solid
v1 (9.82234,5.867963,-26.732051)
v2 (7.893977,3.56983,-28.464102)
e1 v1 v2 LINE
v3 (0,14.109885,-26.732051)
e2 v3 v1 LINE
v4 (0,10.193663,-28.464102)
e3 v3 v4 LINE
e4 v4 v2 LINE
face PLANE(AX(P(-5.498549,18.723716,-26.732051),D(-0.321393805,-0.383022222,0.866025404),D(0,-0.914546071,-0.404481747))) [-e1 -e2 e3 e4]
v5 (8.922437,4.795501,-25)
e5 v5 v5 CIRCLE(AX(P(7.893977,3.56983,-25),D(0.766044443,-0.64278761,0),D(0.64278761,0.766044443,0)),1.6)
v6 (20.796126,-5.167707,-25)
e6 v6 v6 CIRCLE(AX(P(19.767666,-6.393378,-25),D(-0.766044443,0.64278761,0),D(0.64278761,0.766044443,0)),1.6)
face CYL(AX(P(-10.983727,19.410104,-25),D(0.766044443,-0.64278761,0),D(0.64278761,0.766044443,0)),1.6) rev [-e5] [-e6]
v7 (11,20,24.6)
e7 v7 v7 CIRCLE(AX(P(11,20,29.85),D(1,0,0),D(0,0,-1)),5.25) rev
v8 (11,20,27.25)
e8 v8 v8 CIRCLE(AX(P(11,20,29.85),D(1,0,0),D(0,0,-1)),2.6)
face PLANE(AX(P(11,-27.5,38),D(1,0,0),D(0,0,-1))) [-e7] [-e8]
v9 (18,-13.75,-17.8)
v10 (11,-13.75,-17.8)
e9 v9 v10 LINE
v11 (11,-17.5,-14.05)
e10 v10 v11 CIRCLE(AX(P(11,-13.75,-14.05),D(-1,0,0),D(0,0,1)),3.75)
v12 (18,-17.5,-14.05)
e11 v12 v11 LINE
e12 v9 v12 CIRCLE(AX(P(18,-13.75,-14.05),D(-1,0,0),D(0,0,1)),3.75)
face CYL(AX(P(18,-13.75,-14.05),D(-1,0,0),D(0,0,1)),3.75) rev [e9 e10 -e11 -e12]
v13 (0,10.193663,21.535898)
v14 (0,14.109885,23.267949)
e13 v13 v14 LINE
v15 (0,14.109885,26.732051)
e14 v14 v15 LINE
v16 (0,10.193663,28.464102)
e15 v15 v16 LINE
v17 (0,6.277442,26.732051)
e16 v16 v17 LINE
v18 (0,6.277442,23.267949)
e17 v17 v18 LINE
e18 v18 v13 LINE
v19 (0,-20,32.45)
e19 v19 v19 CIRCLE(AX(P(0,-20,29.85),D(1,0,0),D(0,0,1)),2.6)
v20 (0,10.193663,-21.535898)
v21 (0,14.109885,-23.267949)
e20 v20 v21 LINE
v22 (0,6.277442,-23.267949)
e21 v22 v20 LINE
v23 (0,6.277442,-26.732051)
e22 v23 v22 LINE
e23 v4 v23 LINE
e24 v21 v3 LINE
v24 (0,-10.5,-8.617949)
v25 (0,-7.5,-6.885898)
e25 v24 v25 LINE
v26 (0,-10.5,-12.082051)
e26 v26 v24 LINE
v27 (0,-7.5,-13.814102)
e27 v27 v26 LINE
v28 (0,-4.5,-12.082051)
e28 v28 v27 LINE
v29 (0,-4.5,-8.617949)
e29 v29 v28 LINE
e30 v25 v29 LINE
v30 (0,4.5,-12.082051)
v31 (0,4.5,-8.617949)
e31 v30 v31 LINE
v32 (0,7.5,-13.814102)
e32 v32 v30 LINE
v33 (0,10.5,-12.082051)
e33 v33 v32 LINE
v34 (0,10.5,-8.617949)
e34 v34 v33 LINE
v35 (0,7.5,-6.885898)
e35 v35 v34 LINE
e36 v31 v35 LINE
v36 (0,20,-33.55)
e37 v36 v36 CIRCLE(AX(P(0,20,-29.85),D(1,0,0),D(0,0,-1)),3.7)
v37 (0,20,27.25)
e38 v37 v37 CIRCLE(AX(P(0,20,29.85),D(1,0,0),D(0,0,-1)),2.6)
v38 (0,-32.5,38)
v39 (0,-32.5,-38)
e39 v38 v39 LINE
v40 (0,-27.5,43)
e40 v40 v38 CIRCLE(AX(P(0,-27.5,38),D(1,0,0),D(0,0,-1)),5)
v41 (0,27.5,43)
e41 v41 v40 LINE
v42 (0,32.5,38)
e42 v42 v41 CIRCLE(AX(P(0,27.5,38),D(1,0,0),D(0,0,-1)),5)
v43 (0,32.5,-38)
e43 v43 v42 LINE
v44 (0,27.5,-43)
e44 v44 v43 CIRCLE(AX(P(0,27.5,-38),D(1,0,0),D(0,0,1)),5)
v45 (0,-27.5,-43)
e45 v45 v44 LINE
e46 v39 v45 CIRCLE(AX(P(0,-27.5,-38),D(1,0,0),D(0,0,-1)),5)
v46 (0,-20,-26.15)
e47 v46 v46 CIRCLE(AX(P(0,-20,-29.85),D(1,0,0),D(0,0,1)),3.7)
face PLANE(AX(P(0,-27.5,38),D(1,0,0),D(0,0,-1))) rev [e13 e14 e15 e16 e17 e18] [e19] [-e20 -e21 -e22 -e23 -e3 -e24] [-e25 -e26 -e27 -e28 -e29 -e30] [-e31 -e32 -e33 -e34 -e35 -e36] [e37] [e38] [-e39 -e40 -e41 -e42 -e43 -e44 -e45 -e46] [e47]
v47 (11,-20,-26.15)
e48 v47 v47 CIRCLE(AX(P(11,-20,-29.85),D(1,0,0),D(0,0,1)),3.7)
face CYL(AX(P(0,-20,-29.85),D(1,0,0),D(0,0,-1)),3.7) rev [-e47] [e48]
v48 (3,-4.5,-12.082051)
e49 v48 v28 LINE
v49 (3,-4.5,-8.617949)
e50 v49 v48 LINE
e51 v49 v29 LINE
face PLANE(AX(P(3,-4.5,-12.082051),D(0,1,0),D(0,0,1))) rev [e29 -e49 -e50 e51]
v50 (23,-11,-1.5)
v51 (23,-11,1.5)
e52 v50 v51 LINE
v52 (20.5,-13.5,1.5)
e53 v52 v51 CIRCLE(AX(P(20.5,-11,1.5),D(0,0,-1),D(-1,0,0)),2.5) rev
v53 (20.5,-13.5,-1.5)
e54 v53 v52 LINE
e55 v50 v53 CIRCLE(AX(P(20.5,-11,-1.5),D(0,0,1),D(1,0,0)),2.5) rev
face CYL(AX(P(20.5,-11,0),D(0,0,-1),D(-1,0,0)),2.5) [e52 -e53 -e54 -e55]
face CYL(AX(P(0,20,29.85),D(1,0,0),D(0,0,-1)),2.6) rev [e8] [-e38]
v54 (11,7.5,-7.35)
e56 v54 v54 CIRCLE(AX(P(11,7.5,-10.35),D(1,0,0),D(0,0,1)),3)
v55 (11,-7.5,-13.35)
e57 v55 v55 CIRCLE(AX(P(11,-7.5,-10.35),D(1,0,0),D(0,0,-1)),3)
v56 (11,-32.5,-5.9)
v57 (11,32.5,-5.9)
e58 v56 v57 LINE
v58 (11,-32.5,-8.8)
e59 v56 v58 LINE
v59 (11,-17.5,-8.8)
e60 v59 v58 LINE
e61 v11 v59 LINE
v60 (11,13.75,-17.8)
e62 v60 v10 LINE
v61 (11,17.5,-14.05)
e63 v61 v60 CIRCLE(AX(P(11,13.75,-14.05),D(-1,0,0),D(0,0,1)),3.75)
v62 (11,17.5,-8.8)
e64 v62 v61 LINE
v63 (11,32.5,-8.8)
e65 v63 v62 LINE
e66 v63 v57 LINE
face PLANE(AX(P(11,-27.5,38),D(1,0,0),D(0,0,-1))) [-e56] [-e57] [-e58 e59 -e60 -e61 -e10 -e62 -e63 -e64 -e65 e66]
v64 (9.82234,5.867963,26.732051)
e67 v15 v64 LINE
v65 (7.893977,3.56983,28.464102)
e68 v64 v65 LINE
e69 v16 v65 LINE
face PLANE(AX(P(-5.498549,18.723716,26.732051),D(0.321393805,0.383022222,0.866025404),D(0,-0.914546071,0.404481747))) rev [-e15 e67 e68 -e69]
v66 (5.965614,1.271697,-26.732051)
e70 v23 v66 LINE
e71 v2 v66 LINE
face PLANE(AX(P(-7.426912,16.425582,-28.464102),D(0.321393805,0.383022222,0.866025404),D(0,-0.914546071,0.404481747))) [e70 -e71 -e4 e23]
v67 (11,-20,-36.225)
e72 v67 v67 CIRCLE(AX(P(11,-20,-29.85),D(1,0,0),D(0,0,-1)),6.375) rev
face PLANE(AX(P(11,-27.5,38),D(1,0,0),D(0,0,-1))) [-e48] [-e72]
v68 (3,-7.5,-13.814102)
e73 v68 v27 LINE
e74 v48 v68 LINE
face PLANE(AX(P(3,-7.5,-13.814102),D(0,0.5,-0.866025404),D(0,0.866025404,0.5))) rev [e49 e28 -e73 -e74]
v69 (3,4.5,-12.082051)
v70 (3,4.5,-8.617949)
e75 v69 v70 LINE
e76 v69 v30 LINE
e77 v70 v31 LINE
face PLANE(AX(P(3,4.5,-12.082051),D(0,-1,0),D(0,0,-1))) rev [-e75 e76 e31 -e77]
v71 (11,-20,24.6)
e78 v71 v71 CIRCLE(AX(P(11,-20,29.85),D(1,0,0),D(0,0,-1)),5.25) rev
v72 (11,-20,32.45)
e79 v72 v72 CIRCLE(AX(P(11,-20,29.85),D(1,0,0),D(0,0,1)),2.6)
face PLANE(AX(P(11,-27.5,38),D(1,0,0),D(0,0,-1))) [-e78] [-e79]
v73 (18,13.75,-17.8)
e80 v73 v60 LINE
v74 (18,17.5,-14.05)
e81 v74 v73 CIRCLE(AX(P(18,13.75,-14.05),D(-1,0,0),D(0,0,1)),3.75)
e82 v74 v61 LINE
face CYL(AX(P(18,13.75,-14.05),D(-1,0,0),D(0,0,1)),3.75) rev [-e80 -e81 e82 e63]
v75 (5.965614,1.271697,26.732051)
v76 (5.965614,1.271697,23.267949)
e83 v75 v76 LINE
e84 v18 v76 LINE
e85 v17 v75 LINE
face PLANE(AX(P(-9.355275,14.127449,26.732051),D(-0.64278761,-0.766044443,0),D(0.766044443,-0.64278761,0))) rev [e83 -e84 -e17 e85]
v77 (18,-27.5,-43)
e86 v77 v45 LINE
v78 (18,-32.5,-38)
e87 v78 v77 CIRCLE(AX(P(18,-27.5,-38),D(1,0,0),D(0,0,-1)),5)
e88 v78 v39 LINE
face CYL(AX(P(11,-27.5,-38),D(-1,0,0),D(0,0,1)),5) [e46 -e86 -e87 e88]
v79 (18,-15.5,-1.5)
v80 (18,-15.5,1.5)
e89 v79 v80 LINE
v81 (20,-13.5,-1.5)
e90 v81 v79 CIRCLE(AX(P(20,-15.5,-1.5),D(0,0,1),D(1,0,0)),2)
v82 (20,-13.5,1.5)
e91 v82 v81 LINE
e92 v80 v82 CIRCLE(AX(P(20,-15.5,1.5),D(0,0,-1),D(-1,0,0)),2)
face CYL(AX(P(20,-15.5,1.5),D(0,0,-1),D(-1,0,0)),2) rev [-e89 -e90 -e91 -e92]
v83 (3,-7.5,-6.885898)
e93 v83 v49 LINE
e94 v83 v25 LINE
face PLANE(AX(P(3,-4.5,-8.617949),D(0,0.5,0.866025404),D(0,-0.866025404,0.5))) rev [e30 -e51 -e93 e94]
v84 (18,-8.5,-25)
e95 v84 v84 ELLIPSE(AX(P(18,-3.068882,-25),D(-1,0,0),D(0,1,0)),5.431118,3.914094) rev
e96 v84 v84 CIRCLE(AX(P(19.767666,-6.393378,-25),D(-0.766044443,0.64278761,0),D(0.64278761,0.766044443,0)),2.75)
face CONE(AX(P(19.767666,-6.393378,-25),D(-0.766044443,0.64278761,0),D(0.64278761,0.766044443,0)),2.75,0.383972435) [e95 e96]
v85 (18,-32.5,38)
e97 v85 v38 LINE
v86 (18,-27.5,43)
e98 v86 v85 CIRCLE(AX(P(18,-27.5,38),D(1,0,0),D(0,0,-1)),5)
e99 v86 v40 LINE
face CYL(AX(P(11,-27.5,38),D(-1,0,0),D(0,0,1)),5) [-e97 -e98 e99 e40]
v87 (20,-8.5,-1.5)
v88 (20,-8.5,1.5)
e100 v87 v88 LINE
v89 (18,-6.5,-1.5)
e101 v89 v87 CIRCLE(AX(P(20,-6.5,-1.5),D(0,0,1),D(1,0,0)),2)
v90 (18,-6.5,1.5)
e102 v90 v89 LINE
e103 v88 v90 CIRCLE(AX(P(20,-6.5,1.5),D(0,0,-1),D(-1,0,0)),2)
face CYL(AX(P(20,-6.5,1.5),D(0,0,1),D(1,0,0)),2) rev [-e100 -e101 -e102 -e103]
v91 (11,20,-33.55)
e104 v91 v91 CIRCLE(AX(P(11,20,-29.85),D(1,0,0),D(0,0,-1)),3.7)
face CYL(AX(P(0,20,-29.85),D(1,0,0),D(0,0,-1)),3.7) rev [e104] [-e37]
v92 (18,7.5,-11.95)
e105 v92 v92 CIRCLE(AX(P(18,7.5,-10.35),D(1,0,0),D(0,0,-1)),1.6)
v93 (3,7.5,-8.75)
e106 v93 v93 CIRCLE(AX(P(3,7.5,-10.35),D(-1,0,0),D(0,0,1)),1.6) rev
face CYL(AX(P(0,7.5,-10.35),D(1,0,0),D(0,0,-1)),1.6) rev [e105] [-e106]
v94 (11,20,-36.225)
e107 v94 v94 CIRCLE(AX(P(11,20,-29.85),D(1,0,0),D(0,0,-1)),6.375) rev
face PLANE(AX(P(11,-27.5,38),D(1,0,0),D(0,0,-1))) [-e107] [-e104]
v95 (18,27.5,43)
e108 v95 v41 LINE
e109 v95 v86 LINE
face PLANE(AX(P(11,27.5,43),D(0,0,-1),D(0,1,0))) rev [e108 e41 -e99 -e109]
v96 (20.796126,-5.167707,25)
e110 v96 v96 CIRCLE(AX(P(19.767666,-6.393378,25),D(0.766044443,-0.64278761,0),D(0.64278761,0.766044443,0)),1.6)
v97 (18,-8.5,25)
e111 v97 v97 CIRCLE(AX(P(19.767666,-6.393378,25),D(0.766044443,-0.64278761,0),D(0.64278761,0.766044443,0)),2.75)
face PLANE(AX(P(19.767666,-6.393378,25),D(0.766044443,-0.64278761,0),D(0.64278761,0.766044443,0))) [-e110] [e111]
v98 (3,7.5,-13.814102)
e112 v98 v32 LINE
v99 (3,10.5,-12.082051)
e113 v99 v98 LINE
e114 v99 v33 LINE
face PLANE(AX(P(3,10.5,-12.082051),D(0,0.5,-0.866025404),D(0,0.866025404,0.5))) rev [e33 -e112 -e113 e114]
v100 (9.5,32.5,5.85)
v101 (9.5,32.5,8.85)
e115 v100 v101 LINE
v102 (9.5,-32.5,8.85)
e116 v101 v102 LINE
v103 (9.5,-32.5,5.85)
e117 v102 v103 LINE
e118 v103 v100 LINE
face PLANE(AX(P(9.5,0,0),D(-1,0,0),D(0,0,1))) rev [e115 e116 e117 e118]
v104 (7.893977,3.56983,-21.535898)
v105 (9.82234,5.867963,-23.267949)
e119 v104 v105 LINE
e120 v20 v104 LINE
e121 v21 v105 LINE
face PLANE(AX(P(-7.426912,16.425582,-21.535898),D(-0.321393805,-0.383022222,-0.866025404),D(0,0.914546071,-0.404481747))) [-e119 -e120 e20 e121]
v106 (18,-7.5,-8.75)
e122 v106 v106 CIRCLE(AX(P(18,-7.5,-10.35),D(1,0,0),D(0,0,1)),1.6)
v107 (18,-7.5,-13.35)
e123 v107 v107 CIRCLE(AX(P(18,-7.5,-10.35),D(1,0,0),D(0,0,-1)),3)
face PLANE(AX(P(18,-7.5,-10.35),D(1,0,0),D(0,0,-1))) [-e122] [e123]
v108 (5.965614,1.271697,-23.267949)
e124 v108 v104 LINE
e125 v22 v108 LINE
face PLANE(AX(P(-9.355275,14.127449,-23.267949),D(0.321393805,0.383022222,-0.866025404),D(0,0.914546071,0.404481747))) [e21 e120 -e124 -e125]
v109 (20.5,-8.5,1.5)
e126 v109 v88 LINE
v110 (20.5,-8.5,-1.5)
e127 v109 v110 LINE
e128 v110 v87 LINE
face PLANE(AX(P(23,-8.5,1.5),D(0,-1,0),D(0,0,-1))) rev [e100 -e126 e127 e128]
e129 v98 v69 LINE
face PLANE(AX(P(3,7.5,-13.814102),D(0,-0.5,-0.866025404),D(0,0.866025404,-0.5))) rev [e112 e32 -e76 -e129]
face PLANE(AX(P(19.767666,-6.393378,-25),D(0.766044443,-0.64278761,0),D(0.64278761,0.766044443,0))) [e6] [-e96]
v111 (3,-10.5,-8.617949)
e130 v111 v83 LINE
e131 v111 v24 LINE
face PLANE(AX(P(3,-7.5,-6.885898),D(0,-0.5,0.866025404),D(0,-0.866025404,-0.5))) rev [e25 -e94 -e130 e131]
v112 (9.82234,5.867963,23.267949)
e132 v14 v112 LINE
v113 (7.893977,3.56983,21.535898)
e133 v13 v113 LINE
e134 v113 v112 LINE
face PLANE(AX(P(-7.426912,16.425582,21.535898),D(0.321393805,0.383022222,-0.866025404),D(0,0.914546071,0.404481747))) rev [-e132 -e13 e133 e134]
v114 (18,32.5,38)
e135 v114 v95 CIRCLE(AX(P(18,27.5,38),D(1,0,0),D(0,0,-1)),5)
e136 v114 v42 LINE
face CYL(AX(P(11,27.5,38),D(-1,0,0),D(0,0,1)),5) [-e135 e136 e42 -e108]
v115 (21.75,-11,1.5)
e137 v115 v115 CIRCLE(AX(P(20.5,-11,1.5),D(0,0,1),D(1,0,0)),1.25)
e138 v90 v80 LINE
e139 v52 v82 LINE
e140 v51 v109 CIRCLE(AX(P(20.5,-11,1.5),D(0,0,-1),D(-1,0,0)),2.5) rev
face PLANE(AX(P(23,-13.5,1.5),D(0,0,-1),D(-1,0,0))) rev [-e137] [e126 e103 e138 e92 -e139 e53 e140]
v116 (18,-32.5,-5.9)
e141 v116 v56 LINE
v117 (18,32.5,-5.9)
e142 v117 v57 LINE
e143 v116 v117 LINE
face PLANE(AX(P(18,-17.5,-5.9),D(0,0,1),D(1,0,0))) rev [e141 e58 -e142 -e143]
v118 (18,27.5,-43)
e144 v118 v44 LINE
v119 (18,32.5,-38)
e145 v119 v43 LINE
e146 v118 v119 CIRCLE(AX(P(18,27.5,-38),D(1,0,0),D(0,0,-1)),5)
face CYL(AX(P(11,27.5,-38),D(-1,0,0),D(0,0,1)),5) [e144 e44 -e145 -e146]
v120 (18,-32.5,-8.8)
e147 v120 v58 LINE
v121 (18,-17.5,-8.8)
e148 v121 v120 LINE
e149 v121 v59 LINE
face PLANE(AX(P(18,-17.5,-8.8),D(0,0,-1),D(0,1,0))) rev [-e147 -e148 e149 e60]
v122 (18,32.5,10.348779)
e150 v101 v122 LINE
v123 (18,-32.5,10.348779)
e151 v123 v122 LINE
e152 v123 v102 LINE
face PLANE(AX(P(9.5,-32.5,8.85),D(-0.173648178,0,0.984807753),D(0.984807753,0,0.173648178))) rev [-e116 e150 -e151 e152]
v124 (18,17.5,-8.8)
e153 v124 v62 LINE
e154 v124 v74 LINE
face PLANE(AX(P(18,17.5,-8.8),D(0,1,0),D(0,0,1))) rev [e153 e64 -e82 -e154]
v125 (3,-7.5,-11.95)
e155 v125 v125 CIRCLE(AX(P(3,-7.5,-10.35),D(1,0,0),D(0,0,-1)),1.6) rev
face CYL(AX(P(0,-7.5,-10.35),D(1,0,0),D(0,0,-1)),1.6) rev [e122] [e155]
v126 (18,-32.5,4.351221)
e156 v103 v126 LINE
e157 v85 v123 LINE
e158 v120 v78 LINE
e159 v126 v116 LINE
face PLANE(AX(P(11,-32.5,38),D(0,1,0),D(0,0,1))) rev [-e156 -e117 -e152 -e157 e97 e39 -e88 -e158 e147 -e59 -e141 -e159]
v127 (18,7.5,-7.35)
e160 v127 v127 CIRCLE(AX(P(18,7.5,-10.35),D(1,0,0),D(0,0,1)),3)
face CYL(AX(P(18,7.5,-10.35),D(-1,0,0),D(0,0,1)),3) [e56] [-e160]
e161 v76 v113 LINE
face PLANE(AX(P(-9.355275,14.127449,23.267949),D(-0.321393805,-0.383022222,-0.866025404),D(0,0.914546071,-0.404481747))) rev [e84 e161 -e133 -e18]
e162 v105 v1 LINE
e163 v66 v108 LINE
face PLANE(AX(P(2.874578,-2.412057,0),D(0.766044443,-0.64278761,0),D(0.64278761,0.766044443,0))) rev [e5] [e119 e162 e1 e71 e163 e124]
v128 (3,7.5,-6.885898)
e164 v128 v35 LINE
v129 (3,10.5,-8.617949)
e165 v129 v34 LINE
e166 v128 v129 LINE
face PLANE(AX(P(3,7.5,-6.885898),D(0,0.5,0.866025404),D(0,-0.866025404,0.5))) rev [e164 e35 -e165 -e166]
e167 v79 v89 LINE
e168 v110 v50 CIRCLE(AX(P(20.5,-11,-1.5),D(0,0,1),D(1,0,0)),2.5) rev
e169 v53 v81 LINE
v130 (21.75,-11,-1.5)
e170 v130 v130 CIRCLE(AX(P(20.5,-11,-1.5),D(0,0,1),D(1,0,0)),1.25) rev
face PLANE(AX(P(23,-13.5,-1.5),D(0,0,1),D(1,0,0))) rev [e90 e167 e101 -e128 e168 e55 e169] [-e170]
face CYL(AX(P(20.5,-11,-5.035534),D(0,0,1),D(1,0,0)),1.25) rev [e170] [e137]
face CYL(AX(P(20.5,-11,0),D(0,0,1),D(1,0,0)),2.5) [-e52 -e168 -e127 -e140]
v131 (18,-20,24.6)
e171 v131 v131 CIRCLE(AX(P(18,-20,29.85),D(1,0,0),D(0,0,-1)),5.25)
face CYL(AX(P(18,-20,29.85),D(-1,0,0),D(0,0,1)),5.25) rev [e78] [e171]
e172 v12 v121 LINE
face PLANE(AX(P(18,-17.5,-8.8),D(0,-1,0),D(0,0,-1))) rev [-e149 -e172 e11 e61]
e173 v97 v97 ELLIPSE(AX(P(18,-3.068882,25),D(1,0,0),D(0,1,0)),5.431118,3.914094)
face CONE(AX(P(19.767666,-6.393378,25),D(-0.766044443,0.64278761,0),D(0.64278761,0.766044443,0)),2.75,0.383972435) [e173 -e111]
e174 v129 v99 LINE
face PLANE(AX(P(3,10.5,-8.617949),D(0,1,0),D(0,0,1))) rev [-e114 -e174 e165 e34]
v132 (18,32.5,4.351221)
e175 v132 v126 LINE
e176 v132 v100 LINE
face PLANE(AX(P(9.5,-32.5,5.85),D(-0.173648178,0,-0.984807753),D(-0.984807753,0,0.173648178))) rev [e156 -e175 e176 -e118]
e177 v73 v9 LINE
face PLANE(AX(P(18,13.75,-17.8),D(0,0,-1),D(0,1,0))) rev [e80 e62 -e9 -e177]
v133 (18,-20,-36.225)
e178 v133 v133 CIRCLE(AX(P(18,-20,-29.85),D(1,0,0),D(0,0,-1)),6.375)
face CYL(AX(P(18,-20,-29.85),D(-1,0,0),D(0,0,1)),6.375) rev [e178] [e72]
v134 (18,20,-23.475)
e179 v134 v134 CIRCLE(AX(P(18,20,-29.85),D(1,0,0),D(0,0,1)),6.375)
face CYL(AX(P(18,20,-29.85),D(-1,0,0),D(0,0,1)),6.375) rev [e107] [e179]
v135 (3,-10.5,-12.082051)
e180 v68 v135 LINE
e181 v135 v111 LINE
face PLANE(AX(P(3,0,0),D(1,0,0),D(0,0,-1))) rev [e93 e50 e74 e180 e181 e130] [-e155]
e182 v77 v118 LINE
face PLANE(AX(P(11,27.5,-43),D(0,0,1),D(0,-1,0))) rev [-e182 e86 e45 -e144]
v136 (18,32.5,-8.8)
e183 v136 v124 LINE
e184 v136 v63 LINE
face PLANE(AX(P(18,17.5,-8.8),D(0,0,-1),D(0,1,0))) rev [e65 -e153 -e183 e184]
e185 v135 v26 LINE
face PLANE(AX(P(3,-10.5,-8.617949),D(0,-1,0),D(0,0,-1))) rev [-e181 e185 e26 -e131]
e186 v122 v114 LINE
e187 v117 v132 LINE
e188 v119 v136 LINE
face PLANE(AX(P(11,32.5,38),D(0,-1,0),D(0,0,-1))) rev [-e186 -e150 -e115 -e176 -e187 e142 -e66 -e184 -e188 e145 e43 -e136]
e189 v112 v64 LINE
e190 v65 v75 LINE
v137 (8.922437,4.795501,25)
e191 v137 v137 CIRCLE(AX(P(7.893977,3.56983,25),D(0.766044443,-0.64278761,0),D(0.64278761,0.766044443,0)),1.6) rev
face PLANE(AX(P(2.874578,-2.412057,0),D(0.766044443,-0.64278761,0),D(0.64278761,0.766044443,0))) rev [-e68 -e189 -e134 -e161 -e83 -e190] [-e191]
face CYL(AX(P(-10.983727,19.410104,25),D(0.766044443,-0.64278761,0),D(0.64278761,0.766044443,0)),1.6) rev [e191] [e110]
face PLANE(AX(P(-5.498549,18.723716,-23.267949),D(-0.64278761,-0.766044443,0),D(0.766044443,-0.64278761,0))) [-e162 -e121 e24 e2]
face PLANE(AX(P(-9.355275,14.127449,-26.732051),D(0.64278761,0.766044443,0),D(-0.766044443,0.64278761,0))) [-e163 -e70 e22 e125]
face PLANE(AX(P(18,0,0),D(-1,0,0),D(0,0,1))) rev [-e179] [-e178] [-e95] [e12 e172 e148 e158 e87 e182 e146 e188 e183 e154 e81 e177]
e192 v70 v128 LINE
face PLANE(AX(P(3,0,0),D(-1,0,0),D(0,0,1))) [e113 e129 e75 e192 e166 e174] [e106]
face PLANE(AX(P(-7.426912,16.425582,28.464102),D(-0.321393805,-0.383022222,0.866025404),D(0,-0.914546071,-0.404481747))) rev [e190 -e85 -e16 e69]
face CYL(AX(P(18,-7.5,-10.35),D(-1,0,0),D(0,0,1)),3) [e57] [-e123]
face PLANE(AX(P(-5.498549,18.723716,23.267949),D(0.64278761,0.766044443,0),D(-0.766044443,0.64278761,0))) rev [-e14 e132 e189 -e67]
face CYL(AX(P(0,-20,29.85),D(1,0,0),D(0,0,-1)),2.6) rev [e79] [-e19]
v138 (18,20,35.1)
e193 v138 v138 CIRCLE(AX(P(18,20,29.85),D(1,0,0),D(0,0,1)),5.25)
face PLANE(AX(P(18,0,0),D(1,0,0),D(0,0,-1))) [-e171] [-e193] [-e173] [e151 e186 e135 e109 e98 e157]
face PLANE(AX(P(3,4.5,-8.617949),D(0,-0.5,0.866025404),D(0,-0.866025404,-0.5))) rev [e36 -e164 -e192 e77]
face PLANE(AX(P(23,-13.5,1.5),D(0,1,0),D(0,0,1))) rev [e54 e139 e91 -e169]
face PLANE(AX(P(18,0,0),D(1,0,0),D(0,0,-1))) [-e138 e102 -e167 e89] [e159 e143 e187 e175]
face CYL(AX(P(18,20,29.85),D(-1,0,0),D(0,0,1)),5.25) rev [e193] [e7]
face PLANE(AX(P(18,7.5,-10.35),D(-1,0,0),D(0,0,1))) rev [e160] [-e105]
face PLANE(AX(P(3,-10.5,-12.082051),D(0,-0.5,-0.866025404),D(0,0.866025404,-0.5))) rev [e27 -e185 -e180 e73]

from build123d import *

# Parameters (mm, degrees)
BOSS_EXTRUDE1_DEPTH = 11
CLEAR_HOLE_BOLT_R   = 3.7
CLEAR_HOLE_BOLT_R_2 = 2.6
CUT_EXTRUDE1_DEPTH  = 56.011362463
SKETCH5_R           = 3
SKETCH5_W           = 5
SKETCH5_H           = 15
BOSS_EXTRUDE2_DEPTH = 7
M3_SUPPORT_HOLES_R  = 1.6
CUT_EXTRUDE2_DEPTH  = 57.826490302
CUT_EXTRUDE4_DEPTH  = 3
SKETCH7_R           = 5.25
SKETCH7_R_2         = 6.375
BOSS_EXTRUDE3_DEPTH = 7
CUT_EXTRUDE5_START  = -32.5
CUT_EXTRUDE5_DEPTH  = 65
SKETCH24_R          = 1.6
CUT_EXTRUDE7_DEPTH  = 64.877232071
CUT_EXTRUDE8_START  = -15.5
CUT_EXTRUDE8_DEPTH  = 20
SKETCH26_W          = 3
SKETCH26_H          = 5
BOSS_EXTRUDE7_DEPTH = 5
SKETCH27_R          = 1.25
CUT_EXTRUDE9_DEPTH  = 3
FILLET1_R           = 2.5
FILLET2_R           = 2


# Read off the part's stored shape, not the designer's step: Cut-Extrude5, Boss-Extrude6
with BuildPart() as part:
    # Main Body → Boss-Extrude1 (new body)
    with BuildSketch(Plane(origin=(0, 0, 0), x_dir=(0, 0, -1), z_dir=(1, 0, 0))):
        with BuildLine():
            Line((-38, 32.5), (38, 32.5))
            ThreePointArc((38, 32.5), (41.535533906, 31.035533906), (43, 27.5))
            Line((43, 27.5), (43, -27.5))
            ThreePointArc((43, -27.5), (41.535533906, -31.035533906), (38, -32.5))
            Line((38, -32.5), (-38, -32.5))
            ThreePointArc((-38, -32.5), (-41.535533906, -31.035533906), (-43, -27.5))
            Line((-43, -27.5), (-43, 27.5))
            ThreePointArc((-43, 27.5), (-41.535533906, 31.035533906), (-38, 32.5))
        make_face()
    extrude(amount=BOSS_EXTRUDE1_DEPTH)

    # Clear Hole-Bolt → Cut-Extrude1 (cut, through all)
    with BuildSketch(Plane(origin=(11, 0, 0), x_dir=(0, 0, -1), z_dir=(1, 0, 0))):
        with Locations((29.85, 20)):
            Circle(CLEAR_HOLE_BOLT_R)
        with Locations((-29.85, 20)):
            Circle(CLEAR_HOLE_BOLT_R_2)
        with Locations(Location((-29.85, -20, 0), (0, 0, 180))):
            Circle(CLEAR_HOLE_BOLT_R_2)
        with Locations(Location((29.85, -20, 0), (0, 0, 180))):
            Circle(CLEAR_HOLE_BOLT_R)
    extrude(amount=-CUT_EXTRUDE1_DEPTH, mode=Mode.SUBTRACT)

    # Sketch5 → Boss-Extrude2 (add)
    with BuildSketch(Plane(origin=(11, 0, 0), x_dir=(0, 0, -1), z_dir=(1, 0, 0))):
        with Locations((10.35, -7.5)):
            Circle(SKETCH5_R)
        with Locations(Location((10.35, 7.5, 0), (0, 0, 180))):
            Circle(SKETCH5_R)
        with Locations((11.3, -25)):
            Rectangle(SKETCH5_W, SKETCH5_H)
        with Locations((3.4, -25)):
            Rectangle(SKETCH5_W, SKETCH5_H)
        with Locations((11.3, 25)):
            Rectangle(SKETCH5_W, SKETCH5_H)
        with Locations((3.4, 25)):
            Rectangle(SKETCH5_W, SKETCH5_H)
    extrude(amount=BOSS_EXTRUDE2_DEPTH)

    # M3 Support Holes → Cut-Extrude2 (cut, through all)
    with BuildSketch(Plane(origin=(18, 0, 0), x_dir=(0, 0, -1), z_dir=(1, 0, 0))):
        with Locations((10.35, 7.5)):
            Circle(M3_SUPPORT_HOLES_R)
        with Locations(Location((10.35, -7.5, 0), (0, 0, 180))):
            Circle(M3_SUPPORT_HOLES_R)
    extrude(amount=-CUT_EXTRUDE2_DEPTH, mode=Mode.SUBTRACT)

    # M3 Nut Support → Cut-Extrude4 (cut)
    with BuildSketch(Plane.ZY):
        Polygon((-8.617949192, 10.5), (-12.082050808, 10.5), (-13.814101615, 7.5), (-12.082050808, 4.5), (-8.617949192, 4.5), (-6.885898385, 7.5), align=None)
        Polygon((-6.885898385, -7.5), (-8.617949192, -10.5), (-12.082050808, -10.5), (-13.814101615, -7.5), (-12.082050808, -4.5), (-8.617949192, -4.5), align=None)
    extrude(amount=-CUT_EXTRUDE4_DEPTH, mode=Mode.SUBTRACT)

    # Sketch7 → Boss-Extrude3 (add)
    # profile 1 of 2: a face of its own
    with BuildSketch(Plane(origin=(11, 0, 0), x_dir=(0, 0, -1), z_dir=(1, 0, 0))):
        with BuildLine():
            Line((5.9, 32.5), (5.9, -32.5))
            Line((5.9, -32.5), (-38, -32.5))
            ThreePointArc((-38, -32.5), (-41.535533906, -31.035533906), (-43, -27.5))
            Line((-43, -27.5), (-43, 27.5))
            ThreePointArc((-43, 27.5), (-41.535533906, 31.035533906), (-38, 32.5))
            Line((-38, 32.5), (5.9, 32.5))
        make_face()
        with Locations((-29.85, -20)):
            Circle(SKETCH7_R, mode=Mode.SUBTRACT)
        with Locations(Location((-29.85, 20, 0), (0, 0, 180))):
            Circle(SKETCH7_R, mode=Mode.SUBTRACT)
    # profile 2 of 2: a face of its own
    with BuildSketch(Plane(origin=(11, 0, 0), x_dir=(0, 0, -1), z_dir=(1, 0, 0))):
        with BuildLine():
            Line((13.8, 32.5), (13.8, 17.5))
            Line((13.8, 17.5), (14.05, 17.5))
            ThreePointArc((14.05, 17.5), (16.701650429, 16.401650429), (17.8, 13.75))
            Line((17.8, 13.75), (17.8, -13.75))
            ThreePointArc((17.8, -13.75), (16.701650429, -16.401650429), (14.05, -17.5))
            Line((14.05, -17.5), (13.8, -17.5))
            Line((13.8, -17.5), (13.8, -32.5))
            Line((13.8, -32.5), (38, -32.5))
            ThreePointArc((38, -32.5), (41.535533906, -31.035533906), (43, -27.5))
            Line((43, -27.5), (43, 27.5))
            ThreePointArc((43, 27.5), (41.535533906, 31.035533906), (38, 32.5))
            Line((38, 32.5), (13.8, 32.5))
        make_face()
        with Locations((29.85, -20)):
            Circle(SKETCH7_R_2, mode=Mode.SUBTRACT)
        with Locations(Location((29.85, 20, 0), (0, 0, 180))):
            Circle(SKETCH7_R_2, mode=Mode.SUBTRACT)
    extrude(amount=BOSS_EXTRUDE3_DEPTH)

    # Cut-Extrude5 outline → Cut-Extrude5 (cut)
    with BuildSketch(Plane(origin=(0, 0, 0), x_dir=(1, 0, 0), z_dir=(0, 1, 0)).offset(CUT_EXTRUDE5_START)):
        Polygon((18, -10.348779336), (18, -4.351220664), (9.5, -5.85), (9.5, -8.85), align=None)
    extrude(amount=CUT_EXTRUDE5_DEPTH, mode=Mode.SUBTRACT)

    # Boss-Extrude6 outline → Boss-Extrude6 (revolve)
    with BuildSketch(Plane(origin=(5.019399377, 5.981887241, 25), x_dir=(0.6427876096865357, 0.7660444431189811, 0), z_dir=(0, 0, -1))):
        Polygon((5.590261427, 12.222600941), (2.75, 19.252494658), (0, 19.252494658), (0, 12.222600941), align=None)
    boss_extrude6 = revolve(axis=Axis((5.019399377, 5.981887241, 25), (0.7660444431189813, -0.6427876096865358, 0)))

    # Sketch24 → Cut-Extrude7 (cut, through all)
    with BuildSketch(Plane(origin=(14.748266549, -12.375265022, 0), x_dir=(0, 0, -1), z_dir=(0.7660444431189812, -0.6427876096865357, 0))):
        with Locations(Location((-25, 7.808799208, 0), (0, 0, 90))):
            Circle(SKETCH24_R)
    cut_extrude7 = extrude(amount=-CUT_EXTRUDE7_DEPTH, mode=Mode.SUBTRACT)

    # Sketch25 → Cut-Extrude8 (cut)
    with BuildSketch(Plane(origin=(14.748266549, -12.375265022, 0), x_dir=(0, 0, -1), z_dir=(0.7660444431189812, -0.6427876096865356, 0)).offset(CUT_EXTRUDE8_START)):
        Polygon((-23.267949192, 10.808799208), (-26.732050808, 10.808799208), (-28.464101615, 7.808799208), (-26.732050808, 4.808799208), (-23.267949192, 4.808799208), (-21.535898385, 7.808799208), align=None)
    cut_extrude8 = extrude(amount=-CUT_EXTRUDE8_DEPTH, mode=Mode.SUBTRACT)

    # Mirror2: Boss-Extrude6, Cut-Extrude7, Cut-Extrude8 across plane
    add(boss_extrude6.mirror(Plane.XY))
    add(cut_extrude7.mirror(Plane.XY), mode=Mode.SUBTRACT)
    add(cut_extrude8.mirror(Plane.XY), mode=Mode.SUBTRACT)

    # Sketch26 → Boss-Extrude7 (add)
    with BuildSketch(Plane(origin=(18, 0, 0), x_dir=(0, 0, -1), z_dir=(1, 0, 0))):
        with Locations((0, -11)):
            Rectangle(SKETCH26_W, SKETCH26_H)
    extrude(amount=BOSS_EXTRUDE7_DEPTH)

    # Sketch27 → Cut-Extrude9 (cut)
    with BuildSketch(Plane.XY.offset(1.5)):
        with Locations((20.5, -11)):
            Circle(SKETCH27_R)
    extrude(amount=-CUT_EXTRUDE9_DEPTH, mode=Mode.SUBTRACT)

    # Fillet1
    fillet1_edges = [part.edges().sort_by_distance(p)[0] for p in [
        (23, -13.5, 0),
        (23, -8.5, 0),
    ]]
    fillet(fillet1_edges, radius=FILLET1_R - 0.0001)  # a hair under: the kernel refuses the full size

    # Fillet2
    fillet2_edges = [part.edges().sort_by_distance(p)[0] for p in [
        (18, -8.5, 0),
        (18, -13.5, 0),
    ]]
    fillet(fillet2_edges, radius=FILLET2_R)


solid = part.part
